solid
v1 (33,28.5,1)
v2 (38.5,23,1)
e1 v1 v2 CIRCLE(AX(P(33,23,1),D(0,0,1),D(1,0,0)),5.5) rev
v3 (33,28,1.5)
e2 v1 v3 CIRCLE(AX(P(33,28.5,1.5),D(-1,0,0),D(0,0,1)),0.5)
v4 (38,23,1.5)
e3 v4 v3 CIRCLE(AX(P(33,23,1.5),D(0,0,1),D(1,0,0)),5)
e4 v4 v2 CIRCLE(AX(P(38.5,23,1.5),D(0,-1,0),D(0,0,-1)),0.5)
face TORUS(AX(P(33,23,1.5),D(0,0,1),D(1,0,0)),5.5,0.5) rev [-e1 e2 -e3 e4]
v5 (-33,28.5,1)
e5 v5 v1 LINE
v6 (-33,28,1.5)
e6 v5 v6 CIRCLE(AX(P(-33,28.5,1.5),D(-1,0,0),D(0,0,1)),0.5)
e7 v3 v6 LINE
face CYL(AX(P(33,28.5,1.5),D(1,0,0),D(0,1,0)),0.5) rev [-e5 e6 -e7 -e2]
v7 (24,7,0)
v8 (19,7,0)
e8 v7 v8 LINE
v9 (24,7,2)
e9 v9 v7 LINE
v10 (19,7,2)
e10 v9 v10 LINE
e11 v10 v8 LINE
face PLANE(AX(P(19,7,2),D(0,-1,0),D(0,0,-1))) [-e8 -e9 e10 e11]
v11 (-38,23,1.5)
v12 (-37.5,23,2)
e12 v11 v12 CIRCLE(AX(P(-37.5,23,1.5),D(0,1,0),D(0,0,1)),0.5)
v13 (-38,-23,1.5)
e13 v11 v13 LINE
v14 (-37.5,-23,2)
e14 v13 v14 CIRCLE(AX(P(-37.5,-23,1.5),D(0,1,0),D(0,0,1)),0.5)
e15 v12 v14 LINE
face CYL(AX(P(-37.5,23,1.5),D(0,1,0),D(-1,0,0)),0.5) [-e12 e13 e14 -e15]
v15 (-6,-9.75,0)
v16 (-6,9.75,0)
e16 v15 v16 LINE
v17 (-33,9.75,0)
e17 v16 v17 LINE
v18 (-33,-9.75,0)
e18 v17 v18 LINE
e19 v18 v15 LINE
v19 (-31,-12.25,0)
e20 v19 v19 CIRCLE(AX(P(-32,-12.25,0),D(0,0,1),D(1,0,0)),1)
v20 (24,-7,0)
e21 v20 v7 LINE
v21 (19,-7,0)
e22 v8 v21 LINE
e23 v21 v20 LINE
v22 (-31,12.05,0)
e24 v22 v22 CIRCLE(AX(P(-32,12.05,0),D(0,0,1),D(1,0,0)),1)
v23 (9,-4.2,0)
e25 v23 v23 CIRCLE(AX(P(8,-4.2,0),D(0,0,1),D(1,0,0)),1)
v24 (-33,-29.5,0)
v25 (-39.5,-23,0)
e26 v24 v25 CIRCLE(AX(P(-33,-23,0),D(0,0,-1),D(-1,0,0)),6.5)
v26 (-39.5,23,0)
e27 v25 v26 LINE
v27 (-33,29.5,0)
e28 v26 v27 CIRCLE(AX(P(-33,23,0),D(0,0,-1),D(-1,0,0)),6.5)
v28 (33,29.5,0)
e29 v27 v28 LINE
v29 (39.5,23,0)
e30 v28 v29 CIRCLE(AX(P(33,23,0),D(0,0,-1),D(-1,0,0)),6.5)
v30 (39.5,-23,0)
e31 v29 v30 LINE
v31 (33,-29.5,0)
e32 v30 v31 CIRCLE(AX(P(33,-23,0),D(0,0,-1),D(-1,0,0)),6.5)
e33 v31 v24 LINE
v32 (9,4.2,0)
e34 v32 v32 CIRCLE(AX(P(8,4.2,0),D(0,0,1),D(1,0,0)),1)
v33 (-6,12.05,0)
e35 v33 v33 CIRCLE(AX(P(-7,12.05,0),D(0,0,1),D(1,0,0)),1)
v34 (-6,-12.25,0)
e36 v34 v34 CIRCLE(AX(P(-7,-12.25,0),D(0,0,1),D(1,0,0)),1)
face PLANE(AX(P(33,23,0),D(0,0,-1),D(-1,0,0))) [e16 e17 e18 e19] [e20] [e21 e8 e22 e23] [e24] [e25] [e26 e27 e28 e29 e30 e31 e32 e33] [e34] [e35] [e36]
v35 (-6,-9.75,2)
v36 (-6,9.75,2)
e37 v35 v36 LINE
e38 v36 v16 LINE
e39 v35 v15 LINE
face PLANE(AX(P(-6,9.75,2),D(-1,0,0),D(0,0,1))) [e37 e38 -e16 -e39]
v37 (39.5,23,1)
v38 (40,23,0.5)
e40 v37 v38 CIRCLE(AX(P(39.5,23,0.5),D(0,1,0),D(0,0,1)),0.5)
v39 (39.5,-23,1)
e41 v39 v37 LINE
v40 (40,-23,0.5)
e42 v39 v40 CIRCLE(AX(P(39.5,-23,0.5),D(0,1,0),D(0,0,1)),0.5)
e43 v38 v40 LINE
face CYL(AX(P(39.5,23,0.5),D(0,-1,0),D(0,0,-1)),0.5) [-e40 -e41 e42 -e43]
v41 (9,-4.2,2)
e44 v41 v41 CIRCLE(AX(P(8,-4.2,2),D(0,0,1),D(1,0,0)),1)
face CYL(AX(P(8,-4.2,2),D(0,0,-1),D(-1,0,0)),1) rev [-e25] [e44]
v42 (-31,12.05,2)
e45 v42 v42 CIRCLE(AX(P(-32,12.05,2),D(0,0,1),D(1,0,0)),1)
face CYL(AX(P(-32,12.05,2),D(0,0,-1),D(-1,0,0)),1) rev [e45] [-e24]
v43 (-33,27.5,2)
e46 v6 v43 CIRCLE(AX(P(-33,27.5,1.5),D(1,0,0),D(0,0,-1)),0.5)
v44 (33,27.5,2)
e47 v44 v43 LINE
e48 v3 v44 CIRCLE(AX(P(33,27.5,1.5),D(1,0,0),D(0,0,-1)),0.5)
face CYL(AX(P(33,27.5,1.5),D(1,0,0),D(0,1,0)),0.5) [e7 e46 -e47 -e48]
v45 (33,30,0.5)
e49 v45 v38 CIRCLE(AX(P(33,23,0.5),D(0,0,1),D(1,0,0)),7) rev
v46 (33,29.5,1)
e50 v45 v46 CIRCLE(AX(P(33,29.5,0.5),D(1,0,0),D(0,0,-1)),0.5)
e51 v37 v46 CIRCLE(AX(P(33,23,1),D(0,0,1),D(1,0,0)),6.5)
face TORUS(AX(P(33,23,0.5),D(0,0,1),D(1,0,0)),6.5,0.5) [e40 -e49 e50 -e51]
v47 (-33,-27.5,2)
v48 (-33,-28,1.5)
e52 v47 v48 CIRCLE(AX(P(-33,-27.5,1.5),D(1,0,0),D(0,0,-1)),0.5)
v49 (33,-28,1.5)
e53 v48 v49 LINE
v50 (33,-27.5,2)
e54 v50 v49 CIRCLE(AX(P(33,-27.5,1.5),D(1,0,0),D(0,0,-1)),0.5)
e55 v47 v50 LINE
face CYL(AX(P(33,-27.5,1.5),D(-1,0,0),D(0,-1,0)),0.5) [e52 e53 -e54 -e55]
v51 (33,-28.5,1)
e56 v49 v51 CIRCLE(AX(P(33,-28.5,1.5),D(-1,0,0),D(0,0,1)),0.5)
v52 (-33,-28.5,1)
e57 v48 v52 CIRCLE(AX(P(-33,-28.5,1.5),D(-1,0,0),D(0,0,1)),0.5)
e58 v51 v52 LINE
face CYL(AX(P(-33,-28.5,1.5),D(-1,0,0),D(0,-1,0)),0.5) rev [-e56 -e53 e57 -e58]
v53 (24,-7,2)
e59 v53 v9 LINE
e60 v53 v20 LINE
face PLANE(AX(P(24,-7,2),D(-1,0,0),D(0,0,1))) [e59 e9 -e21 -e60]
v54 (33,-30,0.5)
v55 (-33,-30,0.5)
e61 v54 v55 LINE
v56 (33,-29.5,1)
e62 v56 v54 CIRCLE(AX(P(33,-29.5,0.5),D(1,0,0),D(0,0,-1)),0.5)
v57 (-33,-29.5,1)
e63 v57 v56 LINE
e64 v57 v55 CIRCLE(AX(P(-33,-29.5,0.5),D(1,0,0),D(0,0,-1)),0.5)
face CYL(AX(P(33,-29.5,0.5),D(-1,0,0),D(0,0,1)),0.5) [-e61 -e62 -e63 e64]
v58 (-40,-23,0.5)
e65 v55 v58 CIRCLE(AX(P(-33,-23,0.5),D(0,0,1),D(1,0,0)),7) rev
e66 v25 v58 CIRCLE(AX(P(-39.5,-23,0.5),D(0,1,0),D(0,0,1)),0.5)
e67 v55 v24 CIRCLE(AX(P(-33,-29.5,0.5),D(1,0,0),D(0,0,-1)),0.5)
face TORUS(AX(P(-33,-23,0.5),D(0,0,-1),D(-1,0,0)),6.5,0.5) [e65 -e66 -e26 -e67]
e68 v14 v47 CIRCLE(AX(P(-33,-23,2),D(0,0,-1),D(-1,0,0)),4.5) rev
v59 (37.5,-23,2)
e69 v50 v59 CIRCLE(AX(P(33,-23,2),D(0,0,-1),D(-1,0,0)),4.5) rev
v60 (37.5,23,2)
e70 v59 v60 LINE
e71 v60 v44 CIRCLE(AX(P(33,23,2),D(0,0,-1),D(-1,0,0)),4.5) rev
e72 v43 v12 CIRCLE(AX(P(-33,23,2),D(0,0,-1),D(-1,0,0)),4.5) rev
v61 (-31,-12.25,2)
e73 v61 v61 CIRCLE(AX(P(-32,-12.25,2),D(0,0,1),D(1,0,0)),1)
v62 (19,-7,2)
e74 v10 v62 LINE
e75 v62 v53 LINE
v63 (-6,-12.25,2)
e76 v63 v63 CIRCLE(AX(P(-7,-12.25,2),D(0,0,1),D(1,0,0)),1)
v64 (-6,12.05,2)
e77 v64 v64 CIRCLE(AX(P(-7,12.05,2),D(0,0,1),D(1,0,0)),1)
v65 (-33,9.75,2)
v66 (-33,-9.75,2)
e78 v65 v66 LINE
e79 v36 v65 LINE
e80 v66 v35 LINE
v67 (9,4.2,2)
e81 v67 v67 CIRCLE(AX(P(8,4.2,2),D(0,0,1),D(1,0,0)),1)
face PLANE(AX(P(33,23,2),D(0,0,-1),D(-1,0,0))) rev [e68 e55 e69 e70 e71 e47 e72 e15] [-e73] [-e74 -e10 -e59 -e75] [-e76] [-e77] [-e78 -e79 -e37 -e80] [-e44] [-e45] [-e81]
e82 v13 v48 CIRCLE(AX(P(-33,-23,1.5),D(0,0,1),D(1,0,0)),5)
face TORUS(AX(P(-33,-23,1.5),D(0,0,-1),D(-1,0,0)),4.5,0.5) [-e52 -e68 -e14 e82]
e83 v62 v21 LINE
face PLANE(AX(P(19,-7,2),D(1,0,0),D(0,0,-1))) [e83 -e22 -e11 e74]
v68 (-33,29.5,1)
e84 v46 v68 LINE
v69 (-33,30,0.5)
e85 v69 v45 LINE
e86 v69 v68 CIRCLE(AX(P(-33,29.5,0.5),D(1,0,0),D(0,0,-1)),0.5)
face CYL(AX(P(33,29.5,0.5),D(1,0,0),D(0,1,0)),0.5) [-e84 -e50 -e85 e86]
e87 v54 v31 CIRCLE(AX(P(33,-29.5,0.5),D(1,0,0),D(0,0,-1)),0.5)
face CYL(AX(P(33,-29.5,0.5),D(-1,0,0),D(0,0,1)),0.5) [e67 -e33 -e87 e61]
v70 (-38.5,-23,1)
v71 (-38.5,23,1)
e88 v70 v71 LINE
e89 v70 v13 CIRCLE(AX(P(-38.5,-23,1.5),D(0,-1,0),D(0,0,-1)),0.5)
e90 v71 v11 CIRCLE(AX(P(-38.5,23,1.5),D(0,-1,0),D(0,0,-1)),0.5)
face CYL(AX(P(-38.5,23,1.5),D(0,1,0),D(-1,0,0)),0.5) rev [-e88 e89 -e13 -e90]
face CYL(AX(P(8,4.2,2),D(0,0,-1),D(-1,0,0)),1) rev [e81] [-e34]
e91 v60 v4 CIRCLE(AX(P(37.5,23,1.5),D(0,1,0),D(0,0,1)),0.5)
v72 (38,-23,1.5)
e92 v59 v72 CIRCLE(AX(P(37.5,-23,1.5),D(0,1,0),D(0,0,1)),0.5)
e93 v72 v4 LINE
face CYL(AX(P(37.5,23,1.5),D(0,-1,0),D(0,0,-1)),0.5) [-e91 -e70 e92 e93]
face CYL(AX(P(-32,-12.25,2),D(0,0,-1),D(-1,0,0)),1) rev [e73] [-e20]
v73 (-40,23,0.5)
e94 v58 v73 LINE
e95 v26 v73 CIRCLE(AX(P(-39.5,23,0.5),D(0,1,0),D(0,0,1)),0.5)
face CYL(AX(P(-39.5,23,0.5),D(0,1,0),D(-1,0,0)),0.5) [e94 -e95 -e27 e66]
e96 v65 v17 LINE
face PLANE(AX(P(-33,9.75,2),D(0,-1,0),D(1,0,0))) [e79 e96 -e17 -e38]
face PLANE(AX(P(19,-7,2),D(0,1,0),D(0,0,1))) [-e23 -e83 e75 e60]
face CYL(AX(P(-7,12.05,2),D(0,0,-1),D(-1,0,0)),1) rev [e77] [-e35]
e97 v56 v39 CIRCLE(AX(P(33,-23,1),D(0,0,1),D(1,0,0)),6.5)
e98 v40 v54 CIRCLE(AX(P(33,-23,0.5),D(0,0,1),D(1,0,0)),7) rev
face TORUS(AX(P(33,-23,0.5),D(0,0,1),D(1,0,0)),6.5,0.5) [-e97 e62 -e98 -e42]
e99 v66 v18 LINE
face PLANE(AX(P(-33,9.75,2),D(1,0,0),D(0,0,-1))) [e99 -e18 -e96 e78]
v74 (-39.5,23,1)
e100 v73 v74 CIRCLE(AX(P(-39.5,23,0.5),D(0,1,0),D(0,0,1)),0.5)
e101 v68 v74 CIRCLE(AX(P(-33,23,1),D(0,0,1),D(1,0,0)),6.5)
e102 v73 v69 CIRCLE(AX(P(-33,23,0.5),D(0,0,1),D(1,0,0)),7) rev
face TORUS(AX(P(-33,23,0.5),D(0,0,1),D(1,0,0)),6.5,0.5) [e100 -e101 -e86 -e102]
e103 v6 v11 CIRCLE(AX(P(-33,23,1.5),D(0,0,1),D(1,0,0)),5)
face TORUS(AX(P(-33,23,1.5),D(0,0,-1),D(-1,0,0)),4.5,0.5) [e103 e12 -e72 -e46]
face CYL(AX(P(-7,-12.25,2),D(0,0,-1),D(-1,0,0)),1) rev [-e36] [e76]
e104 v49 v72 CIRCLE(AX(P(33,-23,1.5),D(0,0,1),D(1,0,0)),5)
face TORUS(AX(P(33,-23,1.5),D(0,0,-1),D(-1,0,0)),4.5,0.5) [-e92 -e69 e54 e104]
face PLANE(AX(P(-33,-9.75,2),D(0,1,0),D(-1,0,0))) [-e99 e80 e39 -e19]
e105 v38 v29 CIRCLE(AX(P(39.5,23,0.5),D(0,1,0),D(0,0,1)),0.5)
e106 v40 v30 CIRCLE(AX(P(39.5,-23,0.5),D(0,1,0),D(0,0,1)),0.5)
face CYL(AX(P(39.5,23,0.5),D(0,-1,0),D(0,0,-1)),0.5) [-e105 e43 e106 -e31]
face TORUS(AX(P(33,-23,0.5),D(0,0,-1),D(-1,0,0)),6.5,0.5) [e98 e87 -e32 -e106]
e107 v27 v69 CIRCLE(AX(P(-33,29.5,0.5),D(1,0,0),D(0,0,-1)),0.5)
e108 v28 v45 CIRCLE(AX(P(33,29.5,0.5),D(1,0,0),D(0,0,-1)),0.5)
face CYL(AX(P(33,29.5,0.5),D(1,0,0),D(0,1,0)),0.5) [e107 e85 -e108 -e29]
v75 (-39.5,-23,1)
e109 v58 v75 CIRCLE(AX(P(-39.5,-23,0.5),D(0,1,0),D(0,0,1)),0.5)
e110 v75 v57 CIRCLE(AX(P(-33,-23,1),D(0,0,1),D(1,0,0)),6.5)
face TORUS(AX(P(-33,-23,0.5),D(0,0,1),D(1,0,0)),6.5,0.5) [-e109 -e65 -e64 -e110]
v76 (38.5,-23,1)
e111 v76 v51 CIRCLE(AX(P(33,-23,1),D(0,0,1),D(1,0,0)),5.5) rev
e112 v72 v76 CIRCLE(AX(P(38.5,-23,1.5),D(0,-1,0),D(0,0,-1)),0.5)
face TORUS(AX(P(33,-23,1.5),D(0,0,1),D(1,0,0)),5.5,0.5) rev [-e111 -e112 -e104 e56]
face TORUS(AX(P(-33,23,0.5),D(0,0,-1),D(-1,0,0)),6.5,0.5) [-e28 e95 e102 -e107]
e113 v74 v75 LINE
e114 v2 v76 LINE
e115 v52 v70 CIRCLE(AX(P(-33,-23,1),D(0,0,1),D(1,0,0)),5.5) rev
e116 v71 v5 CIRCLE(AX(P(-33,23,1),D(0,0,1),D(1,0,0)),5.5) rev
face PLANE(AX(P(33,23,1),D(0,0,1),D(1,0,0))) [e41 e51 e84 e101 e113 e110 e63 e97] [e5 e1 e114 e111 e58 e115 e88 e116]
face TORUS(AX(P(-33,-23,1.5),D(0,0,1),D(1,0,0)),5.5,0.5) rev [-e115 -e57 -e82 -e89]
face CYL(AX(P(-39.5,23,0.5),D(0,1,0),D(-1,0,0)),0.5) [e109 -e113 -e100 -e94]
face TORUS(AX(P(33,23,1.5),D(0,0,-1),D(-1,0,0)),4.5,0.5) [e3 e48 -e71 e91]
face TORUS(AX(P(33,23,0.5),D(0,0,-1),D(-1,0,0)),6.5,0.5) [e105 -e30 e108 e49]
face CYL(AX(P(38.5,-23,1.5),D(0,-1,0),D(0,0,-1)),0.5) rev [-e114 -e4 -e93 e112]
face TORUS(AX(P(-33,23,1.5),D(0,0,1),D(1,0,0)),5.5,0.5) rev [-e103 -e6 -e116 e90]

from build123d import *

# Parameters (mm, degrees)
ESQUISSE1_R             = 1
ESQUISSE1_W             = 27
ESQUISSE1_H             = 19.5
ESQUISSE1_W_2           = 5
ESQUISSE1_H_2           = 14
BOSS_EXTRU_1_DEPTH      = 2
ENL_V_START             = -1
ENL_V_MAT_EXTRU_1_DEPTH = 1
CONG_1_R                = 0.5


with BuildPart() as part:
    # Esquisse1 → Boss.-Extru.1 (new body)
    with BuildSketch(Plane.XY):
        with BuildLine():
            Line((33, 30), (-33, 30))
            ThreePointArc((-33, 30), (-37.949747468, 27.949747468), (-40, 23))
            Line((-40, 23), (-40, -23))
            ThreePointArc((-40, -23), (-37.949747468, -27.949747468), (-33, -30))
            Line((-33, -30), (33, -30))
            ThreePointArc((33, -30), (37.949747468, -27.949747468), (40, -23))
            Line((40, -23), (40, 23))
            ThreePointArc((40, 23), (37.949747468, 27.949747468), (33, 30))
        make_face()
        with Locations((-32, 12.05)):
            Circle(ESQUISSE1_R, mode=Mode.SUBTRACT)
        with Locations((-7, 12.05)):
            Circle(ESQUISSE1_R, mode=Mode.SUBTRACT)
        with Locations((-7, -12.25)):
            Circle(ESQUISSE1_R, mode=Mode.SUBTRACT)
        with Locations((-32, -12.25)):
            Circle(ESQUISSE1_R, mode=Mode.SUBTRACT)
        with Locations((8, 4.2)):
            Circle(ESQUISSE1_R, mode=Mode.SUBTRACT)
        with Locations((8, -4.2)):
            Circle(ESQUISSE1_R, mode=Mode.SUBTRACT)
        with Locations((-19.5, 0)):
            Rectangle(ESQUISSE1_W, ESQUISSE1_H, mode=Mode.SUBTRACT)
        with Locations((21.5, 0)):
            Rectangle(ESQUISSE1_W_2, ESQUISSE1_H_2, mode=Mode.SUBTRACT)
    extrude(amount=BOSS_EXTRU_1_DEPTH)

    # Esquisse2 → Enlèv. mat.-Extru.1 (cut)
    with BuildSketch(Plane.XY.offset(2).offset(ENL_V_START)):
        with BuildLine():
            Line((40, -23), (40, 23))
            ThreePointArc((40, 23), (37.949747468, 27.949747468), (33, 30))
            Line((33, 30), (-33, 30))
            ThreePointArc((-33, 30), (-37.949747468, 27.949747468), (-40, 23))
            Line((-40, 23), (-40, -23))
            ThreePointArc((-40, -23), (-37.949747468, -27.949747468), (-33, -30))
            Line((-33, -30), (33, -30))
            ThreePointArc((33, -30), (37.949747468, -27.949747468), (40, -23))
        make_face()
        with BuildLine():
            Line((38, -23), (38, 23))
            ThreePointArc((38, 23), (36.535533906, 26.535533906), (33, 28))
            Line((33, 28), (-33, 28))
            ThreePointArc((-33, 28), (-36.535533906, 26.535533906), (-38, 23))
            Line((-38, 23), (-38, -23))
            ThreePointArc((-38, -23), (-36.535533906, -26.535533906), (-33, -28))
            Line((-33, -28), (33, -28))
            ThreePointArc((33, -28), (36.535533906, -26.535533906), (38, -23))
        make_face(mode=Mode.SUBTRACT)
    extrude(amount=ENL_V_MAT_EXTRU_1_DEPTH, mode=Mode.SUBTRACT)

    # Congé1
    cong_1_edges = [part.edges().sort_by_distance(p)[0] for p in [
        (37.949747468, 27.949747468, 0),
        (40, 0, 0),
        (37.949747468, -27.949747468, 0),
        (0, -30, 0),
        (-37.949747468, -27.949747468, 0),
        (-40, 0, 0),
        (-37.949747468, 27.949747468, 0),
        (37.949747468, 27.949747468, 1),
        (40, 0, 1),
        (37.949747468, -27.949747468, 1),
        (0, -30, 1),
        (-37.949747468, -27.949747468, 1),
        (-40, 0, 1),
        (-37.949747468, 27.949747468, 1),
        (36.535533906, 26.535533906, 2),
        (38, 0, 2),
        (36.535533906, -26.535533906, 2),
        (0, -28, 2),
        (-36.535533906, -26.535533906, 2),
        (-38, 0, 2),
        (-36.535533906, 26.535533906, 2),
        (36.535533906, 26.535533906, 1),
        (38, 0, 1),
        (36.535533906, -26.535533906, 1),
        (0, -28, 1),
        (-36.535533906, -26.535533906, 1),
        (-38, 0, 1),
        (-36.535533906, 26.535533906, 1),
        (0, 30, 0),
        (0, 30, 1),
        (0, 28, 2),
        (0, 28, 1),
    ]]
    fillet(cong_1_edges, radius=CONG_1_R - 0.0001)  # a hair under: the kernel refuses the full size


solid = part.part
